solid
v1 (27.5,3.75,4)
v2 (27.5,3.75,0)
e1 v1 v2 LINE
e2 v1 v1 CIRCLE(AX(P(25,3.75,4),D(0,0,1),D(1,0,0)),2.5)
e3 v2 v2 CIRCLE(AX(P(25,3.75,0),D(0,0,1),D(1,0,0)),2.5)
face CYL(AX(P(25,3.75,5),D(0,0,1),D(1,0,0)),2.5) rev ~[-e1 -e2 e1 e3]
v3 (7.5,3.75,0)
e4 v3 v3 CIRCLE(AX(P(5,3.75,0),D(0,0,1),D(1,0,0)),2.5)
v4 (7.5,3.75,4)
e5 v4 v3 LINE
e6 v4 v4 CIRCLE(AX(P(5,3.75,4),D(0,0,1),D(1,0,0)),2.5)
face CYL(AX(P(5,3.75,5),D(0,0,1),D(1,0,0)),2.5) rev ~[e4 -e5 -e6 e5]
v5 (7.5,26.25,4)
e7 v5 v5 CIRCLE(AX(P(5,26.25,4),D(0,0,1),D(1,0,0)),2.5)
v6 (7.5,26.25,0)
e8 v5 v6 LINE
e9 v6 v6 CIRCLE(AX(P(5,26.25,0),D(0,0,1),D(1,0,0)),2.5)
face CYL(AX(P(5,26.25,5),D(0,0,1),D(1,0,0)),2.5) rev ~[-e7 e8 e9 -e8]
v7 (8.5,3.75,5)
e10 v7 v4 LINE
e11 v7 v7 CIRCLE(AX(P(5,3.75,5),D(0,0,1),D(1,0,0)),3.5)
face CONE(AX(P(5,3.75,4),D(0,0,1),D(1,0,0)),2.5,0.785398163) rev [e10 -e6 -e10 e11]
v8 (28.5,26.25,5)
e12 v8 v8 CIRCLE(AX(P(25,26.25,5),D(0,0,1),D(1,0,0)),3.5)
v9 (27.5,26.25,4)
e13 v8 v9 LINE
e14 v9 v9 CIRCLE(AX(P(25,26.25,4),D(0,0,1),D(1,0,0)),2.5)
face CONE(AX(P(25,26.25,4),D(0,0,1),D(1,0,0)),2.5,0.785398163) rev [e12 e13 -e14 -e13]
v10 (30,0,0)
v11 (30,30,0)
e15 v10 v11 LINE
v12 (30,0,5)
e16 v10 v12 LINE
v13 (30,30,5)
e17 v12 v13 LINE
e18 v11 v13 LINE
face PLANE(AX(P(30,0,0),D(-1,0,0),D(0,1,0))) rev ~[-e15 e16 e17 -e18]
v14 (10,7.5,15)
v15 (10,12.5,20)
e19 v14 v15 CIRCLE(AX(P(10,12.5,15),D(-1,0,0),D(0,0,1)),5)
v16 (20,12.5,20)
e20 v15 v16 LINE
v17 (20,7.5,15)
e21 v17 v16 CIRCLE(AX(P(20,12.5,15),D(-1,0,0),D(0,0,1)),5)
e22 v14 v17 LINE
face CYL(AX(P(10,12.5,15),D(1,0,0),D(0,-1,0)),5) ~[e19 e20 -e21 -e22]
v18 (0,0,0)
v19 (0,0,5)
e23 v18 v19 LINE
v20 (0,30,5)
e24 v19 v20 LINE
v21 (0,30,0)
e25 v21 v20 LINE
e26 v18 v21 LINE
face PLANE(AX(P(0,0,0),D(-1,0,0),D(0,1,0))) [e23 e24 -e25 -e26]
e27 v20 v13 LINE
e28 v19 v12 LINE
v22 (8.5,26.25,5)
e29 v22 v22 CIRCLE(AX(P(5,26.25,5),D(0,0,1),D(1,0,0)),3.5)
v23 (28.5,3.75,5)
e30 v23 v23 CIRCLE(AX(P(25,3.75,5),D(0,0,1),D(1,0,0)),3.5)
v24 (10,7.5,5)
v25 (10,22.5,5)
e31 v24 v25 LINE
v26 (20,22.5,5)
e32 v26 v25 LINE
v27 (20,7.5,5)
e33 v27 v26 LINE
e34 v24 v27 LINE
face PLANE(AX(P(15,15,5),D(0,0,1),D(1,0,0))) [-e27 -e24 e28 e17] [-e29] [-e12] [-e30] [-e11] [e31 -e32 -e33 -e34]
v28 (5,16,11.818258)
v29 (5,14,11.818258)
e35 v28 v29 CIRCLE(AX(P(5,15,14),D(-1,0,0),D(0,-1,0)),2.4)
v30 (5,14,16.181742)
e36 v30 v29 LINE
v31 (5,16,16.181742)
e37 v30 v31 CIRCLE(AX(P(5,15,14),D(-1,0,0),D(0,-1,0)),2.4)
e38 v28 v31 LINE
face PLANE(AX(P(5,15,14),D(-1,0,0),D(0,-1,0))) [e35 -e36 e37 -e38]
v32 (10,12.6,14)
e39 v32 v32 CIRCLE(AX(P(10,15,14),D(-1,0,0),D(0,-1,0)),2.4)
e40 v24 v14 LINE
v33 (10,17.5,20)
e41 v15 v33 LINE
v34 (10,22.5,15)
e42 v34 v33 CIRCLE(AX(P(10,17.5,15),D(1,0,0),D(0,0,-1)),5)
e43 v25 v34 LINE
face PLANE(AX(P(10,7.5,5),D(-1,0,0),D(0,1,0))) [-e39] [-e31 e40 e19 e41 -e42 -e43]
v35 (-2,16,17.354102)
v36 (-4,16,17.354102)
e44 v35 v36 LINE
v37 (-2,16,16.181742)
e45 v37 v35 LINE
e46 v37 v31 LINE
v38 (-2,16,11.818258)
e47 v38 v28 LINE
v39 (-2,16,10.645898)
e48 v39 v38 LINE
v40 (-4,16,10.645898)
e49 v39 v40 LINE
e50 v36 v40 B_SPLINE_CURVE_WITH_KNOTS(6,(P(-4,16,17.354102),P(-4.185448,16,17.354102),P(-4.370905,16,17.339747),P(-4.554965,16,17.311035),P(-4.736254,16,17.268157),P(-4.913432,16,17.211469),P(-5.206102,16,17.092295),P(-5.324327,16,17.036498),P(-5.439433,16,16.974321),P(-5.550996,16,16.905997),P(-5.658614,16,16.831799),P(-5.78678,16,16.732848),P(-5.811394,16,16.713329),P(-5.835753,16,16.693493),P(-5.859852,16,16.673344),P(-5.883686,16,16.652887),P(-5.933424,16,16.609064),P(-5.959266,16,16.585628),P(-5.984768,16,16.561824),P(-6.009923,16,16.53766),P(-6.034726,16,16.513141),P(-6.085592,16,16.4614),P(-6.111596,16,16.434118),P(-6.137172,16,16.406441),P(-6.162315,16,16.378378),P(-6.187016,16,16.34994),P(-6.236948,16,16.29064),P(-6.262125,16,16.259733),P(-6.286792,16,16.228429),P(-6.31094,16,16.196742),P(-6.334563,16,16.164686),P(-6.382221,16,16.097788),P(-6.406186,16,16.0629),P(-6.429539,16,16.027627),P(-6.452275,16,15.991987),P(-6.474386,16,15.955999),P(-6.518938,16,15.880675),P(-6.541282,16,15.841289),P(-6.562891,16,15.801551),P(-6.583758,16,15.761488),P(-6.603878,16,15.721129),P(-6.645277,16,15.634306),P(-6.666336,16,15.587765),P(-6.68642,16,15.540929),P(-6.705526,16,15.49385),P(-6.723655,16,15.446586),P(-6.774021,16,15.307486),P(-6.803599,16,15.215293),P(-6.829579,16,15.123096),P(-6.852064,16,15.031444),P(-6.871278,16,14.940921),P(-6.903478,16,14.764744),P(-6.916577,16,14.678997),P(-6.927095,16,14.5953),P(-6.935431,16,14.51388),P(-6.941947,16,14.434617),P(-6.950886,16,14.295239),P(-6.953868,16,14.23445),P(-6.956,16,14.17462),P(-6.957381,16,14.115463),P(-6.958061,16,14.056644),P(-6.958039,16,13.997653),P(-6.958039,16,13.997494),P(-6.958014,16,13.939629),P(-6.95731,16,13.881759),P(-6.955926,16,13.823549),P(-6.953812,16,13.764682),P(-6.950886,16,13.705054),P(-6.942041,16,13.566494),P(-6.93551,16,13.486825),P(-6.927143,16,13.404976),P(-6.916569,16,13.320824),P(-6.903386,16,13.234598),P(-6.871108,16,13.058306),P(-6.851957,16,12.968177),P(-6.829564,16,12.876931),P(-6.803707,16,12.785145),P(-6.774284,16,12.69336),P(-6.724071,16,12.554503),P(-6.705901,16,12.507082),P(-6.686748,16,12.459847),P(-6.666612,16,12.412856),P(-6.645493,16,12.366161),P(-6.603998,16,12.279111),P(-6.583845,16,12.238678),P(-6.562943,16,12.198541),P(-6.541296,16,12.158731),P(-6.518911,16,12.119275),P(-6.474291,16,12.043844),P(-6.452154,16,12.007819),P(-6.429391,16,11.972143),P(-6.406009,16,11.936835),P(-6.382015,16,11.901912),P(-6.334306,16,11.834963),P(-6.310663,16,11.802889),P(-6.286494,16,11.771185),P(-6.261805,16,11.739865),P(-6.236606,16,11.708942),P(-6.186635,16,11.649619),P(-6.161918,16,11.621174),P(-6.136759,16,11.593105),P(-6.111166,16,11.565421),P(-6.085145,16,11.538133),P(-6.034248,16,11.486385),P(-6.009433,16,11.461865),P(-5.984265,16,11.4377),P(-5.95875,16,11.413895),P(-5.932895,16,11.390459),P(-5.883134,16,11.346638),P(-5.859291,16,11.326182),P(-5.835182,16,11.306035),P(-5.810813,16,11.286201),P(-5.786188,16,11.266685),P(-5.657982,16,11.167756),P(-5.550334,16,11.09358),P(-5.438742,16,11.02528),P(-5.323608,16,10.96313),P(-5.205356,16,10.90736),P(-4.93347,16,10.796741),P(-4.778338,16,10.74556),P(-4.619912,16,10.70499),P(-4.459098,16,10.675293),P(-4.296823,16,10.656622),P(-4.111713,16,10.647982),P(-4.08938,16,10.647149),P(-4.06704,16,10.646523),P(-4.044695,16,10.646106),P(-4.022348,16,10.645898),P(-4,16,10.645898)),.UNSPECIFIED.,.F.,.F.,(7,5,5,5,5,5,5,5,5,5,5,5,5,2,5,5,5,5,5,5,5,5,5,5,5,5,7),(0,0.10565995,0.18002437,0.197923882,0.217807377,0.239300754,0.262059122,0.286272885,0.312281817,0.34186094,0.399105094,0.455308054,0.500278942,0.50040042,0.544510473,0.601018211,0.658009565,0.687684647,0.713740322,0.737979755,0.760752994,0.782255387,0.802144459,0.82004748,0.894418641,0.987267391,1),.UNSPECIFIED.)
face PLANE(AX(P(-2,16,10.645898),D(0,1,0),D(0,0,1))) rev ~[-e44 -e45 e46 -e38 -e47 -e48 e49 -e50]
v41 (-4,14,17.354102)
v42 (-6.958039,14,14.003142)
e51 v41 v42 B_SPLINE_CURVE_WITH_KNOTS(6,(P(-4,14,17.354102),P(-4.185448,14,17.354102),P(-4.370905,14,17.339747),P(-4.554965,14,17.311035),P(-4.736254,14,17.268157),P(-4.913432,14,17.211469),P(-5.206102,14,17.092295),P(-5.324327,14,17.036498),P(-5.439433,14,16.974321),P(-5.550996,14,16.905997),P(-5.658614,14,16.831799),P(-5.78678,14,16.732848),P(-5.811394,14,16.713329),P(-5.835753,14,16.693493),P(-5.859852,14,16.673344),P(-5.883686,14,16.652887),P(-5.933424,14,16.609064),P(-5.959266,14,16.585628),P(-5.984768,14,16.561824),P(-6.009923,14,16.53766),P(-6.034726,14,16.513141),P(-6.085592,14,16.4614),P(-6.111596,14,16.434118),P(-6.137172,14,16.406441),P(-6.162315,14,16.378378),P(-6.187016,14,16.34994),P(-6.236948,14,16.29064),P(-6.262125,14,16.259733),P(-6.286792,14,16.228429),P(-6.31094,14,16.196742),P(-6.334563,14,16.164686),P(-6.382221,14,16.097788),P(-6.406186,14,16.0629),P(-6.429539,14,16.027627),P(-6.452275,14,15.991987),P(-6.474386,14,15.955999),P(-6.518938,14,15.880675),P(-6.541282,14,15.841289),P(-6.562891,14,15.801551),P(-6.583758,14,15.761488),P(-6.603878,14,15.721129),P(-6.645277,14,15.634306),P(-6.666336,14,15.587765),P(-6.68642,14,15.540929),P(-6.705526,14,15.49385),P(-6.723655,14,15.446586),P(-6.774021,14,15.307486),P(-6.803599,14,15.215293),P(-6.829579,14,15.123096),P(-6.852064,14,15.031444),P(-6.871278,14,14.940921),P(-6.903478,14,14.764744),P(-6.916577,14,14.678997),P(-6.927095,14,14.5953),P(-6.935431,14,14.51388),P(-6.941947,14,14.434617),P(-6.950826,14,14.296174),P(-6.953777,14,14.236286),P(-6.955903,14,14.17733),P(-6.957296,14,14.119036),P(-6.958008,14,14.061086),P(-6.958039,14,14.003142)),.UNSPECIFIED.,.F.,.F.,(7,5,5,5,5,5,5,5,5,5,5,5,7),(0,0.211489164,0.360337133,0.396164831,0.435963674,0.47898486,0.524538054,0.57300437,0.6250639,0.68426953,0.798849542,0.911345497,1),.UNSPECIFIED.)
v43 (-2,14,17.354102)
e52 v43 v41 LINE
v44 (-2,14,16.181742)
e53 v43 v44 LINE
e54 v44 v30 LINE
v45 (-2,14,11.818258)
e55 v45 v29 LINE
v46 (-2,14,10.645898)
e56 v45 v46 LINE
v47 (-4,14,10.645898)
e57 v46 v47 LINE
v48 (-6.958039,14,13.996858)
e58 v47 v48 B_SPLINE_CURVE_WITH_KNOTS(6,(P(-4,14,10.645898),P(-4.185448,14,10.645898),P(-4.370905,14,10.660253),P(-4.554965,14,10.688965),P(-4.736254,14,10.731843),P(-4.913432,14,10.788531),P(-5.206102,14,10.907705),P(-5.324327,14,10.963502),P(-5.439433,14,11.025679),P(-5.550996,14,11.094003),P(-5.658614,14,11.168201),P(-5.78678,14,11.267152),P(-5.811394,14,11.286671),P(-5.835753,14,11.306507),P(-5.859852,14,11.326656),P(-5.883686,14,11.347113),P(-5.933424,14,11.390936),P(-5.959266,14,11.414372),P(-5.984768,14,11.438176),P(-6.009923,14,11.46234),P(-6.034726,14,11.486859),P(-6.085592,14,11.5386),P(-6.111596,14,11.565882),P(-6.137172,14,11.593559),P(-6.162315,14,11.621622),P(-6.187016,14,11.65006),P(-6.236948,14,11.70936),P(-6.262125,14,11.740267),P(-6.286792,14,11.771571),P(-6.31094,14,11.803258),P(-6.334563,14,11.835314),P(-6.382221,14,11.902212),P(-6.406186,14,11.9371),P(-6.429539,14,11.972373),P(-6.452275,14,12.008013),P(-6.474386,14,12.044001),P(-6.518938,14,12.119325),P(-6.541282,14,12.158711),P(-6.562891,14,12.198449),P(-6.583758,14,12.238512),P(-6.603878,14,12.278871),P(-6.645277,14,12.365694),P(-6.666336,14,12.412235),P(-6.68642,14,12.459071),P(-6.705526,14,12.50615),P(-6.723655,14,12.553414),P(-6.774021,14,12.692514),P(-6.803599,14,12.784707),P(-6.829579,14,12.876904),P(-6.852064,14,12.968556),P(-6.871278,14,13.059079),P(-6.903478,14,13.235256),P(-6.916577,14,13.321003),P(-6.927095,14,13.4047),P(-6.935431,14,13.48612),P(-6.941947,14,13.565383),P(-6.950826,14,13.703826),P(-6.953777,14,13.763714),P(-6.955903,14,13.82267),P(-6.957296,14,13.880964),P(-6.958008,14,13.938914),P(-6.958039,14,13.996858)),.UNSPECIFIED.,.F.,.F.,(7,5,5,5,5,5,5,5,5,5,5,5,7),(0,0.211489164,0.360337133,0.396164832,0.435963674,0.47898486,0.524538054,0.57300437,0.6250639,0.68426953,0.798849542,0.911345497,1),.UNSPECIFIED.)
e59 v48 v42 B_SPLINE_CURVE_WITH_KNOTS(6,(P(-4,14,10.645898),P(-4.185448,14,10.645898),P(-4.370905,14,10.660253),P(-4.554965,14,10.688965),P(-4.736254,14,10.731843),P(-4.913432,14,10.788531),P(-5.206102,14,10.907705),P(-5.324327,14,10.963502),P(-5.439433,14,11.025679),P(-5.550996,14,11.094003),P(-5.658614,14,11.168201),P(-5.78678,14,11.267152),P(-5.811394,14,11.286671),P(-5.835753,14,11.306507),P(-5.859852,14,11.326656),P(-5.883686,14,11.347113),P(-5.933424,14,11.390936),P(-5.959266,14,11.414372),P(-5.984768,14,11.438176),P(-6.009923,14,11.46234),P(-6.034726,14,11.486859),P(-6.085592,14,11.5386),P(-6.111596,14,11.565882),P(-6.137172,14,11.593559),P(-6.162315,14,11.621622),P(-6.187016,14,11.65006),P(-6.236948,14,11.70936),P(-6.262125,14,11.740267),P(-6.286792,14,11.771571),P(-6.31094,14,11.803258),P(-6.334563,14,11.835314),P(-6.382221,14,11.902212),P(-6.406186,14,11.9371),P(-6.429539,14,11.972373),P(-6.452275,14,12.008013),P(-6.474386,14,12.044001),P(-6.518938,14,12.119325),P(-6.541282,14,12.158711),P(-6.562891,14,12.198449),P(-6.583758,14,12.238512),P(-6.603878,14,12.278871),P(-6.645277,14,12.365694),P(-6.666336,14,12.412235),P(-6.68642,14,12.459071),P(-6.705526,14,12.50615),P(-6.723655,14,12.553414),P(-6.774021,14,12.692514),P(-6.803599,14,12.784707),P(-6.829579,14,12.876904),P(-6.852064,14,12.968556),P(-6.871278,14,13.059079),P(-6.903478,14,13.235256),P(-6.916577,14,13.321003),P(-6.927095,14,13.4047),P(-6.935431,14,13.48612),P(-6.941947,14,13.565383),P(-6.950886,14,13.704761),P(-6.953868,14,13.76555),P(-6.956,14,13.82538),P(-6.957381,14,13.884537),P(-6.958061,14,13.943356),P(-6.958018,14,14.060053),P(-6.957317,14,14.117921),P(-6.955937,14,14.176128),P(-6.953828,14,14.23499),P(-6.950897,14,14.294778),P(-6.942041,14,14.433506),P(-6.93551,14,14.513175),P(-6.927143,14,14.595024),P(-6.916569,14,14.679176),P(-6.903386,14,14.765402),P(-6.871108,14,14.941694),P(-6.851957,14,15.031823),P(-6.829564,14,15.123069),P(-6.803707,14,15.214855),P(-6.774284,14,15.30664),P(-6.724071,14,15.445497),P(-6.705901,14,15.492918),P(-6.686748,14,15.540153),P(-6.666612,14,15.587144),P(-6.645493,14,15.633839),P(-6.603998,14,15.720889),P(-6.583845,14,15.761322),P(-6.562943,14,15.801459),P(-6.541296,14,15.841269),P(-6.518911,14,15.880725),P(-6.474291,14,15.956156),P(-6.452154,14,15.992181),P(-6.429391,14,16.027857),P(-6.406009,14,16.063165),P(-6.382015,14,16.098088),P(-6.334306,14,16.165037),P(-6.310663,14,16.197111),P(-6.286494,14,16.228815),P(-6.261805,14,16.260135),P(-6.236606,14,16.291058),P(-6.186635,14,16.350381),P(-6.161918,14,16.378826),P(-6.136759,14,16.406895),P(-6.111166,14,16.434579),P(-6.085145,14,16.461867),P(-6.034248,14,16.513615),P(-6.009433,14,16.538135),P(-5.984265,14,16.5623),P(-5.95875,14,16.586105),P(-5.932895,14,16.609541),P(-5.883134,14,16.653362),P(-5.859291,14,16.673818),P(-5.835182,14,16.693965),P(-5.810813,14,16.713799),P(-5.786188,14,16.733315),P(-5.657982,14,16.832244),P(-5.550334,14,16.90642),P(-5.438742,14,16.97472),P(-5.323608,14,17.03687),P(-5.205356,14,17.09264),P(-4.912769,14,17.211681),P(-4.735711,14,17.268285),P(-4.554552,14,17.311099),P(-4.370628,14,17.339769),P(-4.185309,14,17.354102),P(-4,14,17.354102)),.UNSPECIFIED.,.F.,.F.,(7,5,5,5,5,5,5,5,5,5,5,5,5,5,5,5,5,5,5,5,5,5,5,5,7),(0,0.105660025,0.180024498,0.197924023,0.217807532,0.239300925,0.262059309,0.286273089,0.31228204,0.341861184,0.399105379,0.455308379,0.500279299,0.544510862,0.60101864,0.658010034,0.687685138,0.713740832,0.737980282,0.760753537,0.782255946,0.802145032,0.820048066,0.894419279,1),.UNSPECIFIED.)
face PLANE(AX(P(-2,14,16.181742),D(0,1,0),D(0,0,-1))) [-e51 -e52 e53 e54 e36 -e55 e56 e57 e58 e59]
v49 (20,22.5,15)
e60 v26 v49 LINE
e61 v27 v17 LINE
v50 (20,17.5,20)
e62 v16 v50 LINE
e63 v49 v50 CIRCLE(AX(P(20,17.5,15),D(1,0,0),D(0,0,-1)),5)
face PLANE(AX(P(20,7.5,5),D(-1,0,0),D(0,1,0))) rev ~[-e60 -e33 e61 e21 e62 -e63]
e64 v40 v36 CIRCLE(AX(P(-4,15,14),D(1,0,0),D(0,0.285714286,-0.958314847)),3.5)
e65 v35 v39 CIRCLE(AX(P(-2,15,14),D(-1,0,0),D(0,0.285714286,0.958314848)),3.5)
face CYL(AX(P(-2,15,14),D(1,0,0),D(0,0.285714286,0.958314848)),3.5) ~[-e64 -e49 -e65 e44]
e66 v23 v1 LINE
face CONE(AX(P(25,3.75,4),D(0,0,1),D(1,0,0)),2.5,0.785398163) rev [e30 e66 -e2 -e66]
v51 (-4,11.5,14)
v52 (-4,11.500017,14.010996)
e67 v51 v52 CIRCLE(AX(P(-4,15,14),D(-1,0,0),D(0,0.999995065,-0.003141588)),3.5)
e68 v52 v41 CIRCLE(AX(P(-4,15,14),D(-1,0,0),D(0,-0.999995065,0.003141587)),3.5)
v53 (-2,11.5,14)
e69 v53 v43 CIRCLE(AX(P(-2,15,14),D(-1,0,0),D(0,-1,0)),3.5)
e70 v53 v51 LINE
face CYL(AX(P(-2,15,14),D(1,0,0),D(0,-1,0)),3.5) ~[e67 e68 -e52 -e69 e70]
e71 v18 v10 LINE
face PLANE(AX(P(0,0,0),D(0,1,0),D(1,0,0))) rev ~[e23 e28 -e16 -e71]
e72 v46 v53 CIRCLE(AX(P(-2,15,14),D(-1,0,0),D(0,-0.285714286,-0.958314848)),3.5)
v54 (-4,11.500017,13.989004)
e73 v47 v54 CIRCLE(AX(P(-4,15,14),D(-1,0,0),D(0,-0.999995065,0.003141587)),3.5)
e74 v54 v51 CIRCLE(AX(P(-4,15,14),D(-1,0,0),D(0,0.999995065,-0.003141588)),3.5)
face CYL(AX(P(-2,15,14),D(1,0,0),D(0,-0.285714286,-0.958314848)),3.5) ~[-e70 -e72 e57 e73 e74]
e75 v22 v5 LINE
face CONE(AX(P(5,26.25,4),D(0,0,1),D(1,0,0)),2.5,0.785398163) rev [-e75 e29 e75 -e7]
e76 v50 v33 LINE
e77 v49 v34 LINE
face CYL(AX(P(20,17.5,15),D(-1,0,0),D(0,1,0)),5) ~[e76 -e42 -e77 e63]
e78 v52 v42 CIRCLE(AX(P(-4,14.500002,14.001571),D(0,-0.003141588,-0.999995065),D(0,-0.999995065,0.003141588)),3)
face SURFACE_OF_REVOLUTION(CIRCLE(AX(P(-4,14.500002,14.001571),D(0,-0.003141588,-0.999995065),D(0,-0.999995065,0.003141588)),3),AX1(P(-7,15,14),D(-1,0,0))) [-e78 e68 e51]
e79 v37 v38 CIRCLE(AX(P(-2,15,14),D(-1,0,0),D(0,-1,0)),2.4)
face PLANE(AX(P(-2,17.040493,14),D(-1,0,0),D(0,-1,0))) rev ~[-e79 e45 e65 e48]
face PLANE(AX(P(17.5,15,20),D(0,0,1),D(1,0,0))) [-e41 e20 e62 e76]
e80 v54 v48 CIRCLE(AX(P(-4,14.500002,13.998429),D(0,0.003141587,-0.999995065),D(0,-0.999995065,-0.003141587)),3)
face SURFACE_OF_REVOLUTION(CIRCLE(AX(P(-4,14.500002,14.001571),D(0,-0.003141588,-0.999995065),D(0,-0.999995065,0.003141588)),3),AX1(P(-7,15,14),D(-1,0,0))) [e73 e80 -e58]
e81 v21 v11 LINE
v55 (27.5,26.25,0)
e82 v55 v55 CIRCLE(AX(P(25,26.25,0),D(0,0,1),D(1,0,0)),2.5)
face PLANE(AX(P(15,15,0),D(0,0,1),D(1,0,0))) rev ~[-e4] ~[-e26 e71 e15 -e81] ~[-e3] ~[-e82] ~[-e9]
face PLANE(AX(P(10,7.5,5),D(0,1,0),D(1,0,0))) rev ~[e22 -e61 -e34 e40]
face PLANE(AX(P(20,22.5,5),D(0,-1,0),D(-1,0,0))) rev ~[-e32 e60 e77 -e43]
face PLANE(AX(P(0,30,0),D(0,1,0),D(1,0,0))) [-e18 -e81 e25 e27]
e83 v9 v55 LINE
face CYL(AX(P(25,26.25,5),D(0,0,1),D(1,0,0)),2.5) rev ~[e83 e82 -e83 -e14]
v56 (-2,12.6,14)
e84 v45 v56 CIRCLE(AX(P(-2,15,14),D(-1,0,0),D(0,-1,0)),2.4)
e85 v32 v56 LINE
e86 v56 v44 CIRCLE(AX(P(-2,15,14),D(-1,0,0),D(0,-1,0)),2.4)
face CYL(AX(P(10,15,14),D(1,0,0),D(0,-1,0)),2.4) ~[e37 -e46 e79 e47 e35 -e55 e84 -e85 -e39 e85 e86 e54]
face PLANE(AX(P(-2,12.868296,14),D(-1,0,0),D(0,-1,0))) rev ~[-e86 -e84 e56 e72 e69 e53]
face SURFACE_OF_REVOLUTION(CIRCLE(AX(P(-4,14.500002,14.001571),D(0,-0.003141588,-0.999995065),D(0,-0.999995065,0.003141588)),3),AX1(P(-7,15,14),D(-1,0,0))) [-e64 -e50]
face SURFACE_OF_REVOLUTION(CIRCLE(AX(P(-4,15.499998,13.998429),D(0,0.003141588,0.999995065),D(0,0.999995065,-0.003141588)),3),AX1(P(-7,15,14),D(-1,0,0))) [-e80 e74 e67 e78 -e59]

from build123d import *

# Parameters (mm, degrees)
F0_W         = 30
F0_H         = 30
F1_DEPTH     = 5
F2_W         = 5
F2_H         = 15
F3_DEPTH     = 15
F4_R         = 2.4
F5_DEPTH     = 12
F6_R         = 2.5
F7_DEPTH     = 5
F8_SIZE      = 1
F9_R         = 5
F11_DEPTH    = 5
F12_T2_ANGLE = 359.64
F12_T4_ANGLE = 359.64
F13_DEPTH    = 7


# Not quite as in the source:
# - a fillet or chamfer that OpenCascade refuses, or shapes differently, is made with other operations: its cross-section is extruded or revolved along the edge and cut away or added


with BuildPart() as f1:
    # F0 (on Top) → F1 (new body)
    with BuildSketch(Plane.XY):
        with Locations((15, 15)):
            Rectangle(F0_W, F0_H)
    extrude(amount=F1_DEPTH)

    # F2 (on face) → F3 (join)
    with BuildSketch(Plane.XY.offset(5)):
        with Locations((17.5, 15)):
            Rectangle(F2_W, F2_H)
        with Locations((12.5, 15)):
            Rectangle(F2_W, F2_H)
    extrude(amount=F3_DEPTH)

    # F4 (on face) → F5 (join)
    with BuildSketch(Plane(origin=(10, 0, 0), x_dir=(0, -1, 0), z_dir=(-1, 0, 0))):
        with Locations((-15, 14)):
            Circle(F4_R)
    extrude(amount=F5_DEPTH)

    # F6 (on face) → F7 (cut, through all)
    with BuildSketch(Plane.XY.offset(5)):
        with Locations((25, 26.25)):
            Circle(F6_R)
        with Locations((5, 26.25)):
            Circle(F6_R)
        with Locations((5, 3.75)):
            Circle(F6_R)
        with Locations((25, 3.75)):
            Circle(F6_R)
    extrude(amount=-F7_DEPTH, mode=Mode.SUBTRACT)

    # F8
    f8_edges = [f1.edges().sort_by_distance(p)[0] for p in [
        (2.5, 26.25, 5),
        (22.5, 26.25, 5),
        (22.5, 3.75, 5),
        (2.5, 3.75, 5),
    ]]
    chamfer(f8_edges, length=F8_SIZE)

    # F9
    f9_edges = [f1.edges().sort_by_distance(p)[0] for p in [
        (15, 22.5, 20),
        (15, 7.5, 20),
    ]]
    fillet(f9_edges, radius=F9_R)

    # F10 (on face) → F11 (join)
    with BuildSketch(Plane(origin=(-2, 0, 0), x_dir=(0, -1, 0), z_dir=(-1, 0, 0))):
        with BuildLine():
            Line((-16, 16.1817424229), (-16, 17.3541019662))
            ThreePointArc((-16, 17.3541019662), (-18.5, 14), (-16, 10.6458980338))
            Line((-16, 10.6458980338), (-16, 11.8182575771))
            ThreePointArc((-16, 11.8182575771), (-17.4, 14), (-16, 16.1817424229))
        make_face()
        with BuildLine():
            ThreePointArc((-14, 10.6458980338), (-12.1937569599, 11.9083499337), (-11.5, 14))
            ThreePointArc((-11.5, 14), (-12.1937569599, 16.0916500663), (-14, 17.3541019662))
            Line((-14, 17.3541019662), (-14, 16.1817424229))
            ThreePointArc((-14, 16.1817424229), (-12.9800990123, 15.2961481397), (-12.6, 14))
            ThreePointArc((-12.6, 14), (-12.9800990123, 12.7038518603), (-14, 11.8182575771))
            Line((-14, 11.8182575771), (-14, 10.6458980338))
        make_face()
        with BuildLine():
            ThreePointArc((-12.6, 14), (-12.9800990123, 15.2961481397), (-14, 16.1817424229))
            Line((-14, 16.1817424229), (-14, 11.8182575771))
            ThreePointArc((-14, 11.8182575771), (-12.9800990123, 12.7038518603), (-12.6, 14))
        make_face()
        with BuildLine():
            Line((-16, 11.8182575771), (-16, 16.1817424229))
            ThreePointArc((-16, 16.1817424229), (-17.4, 14), (-16, 11.8182575771))
        make_face()
    extrude(amount=F11_DEPTH)

    # F12: fillet of radius 3 on 2 edges, made by hand

    # F12_s1 → F12_t2 (revolve, cut)
    with BuildSketch(Plane(origin=(0, 0.0441300513, 14.0469854057), x_dir=(1, 0, 0), z_dir=(0, -0.0031415875, -0.9999950652))):
        with BuildLine():
            ThreePointArc((-4, -11.4559437532), (-6.1213203436, -12.3346234097), (-7, -14.4559437532))
            Line((-7, -14.4559437532), (-7, -11.4559437532))
            Line((-7, -11.4559437532), (-4, -11.4559437532))
        make_face()
    revolve(axis=Axis((-7, 15, 14), (-1, 0, 0)), revolution_arc=F12_T2_ANGLE, mode=Mode.SUBTRACT)

    # F12_s3 → F12_t4 (revolve, cut)
    with BuildSketch(Plane(origin=(0, 0.0441300513, 14.0469854057), x_dir=(1, 0, 0), z_dir=(0, 0.0031415875, 0.9999950652))):
        with BuildLine():
            ThreePointArc((-4, 18.4559437532), (-6.1213203436, 17.5772640968), (-7, 15.4559437532))
            Line((-7, 15.4559437532), (-7, 18.4559437532))
            Line((-7, 18.4559437532), (-4, 18.4559437532))
        make_face()
    revolve(axis=Axis((-7, 15, 14), (-1, 0, 0)), revolution_arc=F12_T4_ANGLE, mode=Mode.SUBTRACT)

    # F13 (cut): a face of the model
    f13_faces = [f1.faces().sort_by_distance(p)[0] for p in [
        (-2, 15, 14),
    ]]
    extrude(f13_faces, amount=-F13_DEPTH, mode=Mode.SUBTRACT)


solid = f1.part
